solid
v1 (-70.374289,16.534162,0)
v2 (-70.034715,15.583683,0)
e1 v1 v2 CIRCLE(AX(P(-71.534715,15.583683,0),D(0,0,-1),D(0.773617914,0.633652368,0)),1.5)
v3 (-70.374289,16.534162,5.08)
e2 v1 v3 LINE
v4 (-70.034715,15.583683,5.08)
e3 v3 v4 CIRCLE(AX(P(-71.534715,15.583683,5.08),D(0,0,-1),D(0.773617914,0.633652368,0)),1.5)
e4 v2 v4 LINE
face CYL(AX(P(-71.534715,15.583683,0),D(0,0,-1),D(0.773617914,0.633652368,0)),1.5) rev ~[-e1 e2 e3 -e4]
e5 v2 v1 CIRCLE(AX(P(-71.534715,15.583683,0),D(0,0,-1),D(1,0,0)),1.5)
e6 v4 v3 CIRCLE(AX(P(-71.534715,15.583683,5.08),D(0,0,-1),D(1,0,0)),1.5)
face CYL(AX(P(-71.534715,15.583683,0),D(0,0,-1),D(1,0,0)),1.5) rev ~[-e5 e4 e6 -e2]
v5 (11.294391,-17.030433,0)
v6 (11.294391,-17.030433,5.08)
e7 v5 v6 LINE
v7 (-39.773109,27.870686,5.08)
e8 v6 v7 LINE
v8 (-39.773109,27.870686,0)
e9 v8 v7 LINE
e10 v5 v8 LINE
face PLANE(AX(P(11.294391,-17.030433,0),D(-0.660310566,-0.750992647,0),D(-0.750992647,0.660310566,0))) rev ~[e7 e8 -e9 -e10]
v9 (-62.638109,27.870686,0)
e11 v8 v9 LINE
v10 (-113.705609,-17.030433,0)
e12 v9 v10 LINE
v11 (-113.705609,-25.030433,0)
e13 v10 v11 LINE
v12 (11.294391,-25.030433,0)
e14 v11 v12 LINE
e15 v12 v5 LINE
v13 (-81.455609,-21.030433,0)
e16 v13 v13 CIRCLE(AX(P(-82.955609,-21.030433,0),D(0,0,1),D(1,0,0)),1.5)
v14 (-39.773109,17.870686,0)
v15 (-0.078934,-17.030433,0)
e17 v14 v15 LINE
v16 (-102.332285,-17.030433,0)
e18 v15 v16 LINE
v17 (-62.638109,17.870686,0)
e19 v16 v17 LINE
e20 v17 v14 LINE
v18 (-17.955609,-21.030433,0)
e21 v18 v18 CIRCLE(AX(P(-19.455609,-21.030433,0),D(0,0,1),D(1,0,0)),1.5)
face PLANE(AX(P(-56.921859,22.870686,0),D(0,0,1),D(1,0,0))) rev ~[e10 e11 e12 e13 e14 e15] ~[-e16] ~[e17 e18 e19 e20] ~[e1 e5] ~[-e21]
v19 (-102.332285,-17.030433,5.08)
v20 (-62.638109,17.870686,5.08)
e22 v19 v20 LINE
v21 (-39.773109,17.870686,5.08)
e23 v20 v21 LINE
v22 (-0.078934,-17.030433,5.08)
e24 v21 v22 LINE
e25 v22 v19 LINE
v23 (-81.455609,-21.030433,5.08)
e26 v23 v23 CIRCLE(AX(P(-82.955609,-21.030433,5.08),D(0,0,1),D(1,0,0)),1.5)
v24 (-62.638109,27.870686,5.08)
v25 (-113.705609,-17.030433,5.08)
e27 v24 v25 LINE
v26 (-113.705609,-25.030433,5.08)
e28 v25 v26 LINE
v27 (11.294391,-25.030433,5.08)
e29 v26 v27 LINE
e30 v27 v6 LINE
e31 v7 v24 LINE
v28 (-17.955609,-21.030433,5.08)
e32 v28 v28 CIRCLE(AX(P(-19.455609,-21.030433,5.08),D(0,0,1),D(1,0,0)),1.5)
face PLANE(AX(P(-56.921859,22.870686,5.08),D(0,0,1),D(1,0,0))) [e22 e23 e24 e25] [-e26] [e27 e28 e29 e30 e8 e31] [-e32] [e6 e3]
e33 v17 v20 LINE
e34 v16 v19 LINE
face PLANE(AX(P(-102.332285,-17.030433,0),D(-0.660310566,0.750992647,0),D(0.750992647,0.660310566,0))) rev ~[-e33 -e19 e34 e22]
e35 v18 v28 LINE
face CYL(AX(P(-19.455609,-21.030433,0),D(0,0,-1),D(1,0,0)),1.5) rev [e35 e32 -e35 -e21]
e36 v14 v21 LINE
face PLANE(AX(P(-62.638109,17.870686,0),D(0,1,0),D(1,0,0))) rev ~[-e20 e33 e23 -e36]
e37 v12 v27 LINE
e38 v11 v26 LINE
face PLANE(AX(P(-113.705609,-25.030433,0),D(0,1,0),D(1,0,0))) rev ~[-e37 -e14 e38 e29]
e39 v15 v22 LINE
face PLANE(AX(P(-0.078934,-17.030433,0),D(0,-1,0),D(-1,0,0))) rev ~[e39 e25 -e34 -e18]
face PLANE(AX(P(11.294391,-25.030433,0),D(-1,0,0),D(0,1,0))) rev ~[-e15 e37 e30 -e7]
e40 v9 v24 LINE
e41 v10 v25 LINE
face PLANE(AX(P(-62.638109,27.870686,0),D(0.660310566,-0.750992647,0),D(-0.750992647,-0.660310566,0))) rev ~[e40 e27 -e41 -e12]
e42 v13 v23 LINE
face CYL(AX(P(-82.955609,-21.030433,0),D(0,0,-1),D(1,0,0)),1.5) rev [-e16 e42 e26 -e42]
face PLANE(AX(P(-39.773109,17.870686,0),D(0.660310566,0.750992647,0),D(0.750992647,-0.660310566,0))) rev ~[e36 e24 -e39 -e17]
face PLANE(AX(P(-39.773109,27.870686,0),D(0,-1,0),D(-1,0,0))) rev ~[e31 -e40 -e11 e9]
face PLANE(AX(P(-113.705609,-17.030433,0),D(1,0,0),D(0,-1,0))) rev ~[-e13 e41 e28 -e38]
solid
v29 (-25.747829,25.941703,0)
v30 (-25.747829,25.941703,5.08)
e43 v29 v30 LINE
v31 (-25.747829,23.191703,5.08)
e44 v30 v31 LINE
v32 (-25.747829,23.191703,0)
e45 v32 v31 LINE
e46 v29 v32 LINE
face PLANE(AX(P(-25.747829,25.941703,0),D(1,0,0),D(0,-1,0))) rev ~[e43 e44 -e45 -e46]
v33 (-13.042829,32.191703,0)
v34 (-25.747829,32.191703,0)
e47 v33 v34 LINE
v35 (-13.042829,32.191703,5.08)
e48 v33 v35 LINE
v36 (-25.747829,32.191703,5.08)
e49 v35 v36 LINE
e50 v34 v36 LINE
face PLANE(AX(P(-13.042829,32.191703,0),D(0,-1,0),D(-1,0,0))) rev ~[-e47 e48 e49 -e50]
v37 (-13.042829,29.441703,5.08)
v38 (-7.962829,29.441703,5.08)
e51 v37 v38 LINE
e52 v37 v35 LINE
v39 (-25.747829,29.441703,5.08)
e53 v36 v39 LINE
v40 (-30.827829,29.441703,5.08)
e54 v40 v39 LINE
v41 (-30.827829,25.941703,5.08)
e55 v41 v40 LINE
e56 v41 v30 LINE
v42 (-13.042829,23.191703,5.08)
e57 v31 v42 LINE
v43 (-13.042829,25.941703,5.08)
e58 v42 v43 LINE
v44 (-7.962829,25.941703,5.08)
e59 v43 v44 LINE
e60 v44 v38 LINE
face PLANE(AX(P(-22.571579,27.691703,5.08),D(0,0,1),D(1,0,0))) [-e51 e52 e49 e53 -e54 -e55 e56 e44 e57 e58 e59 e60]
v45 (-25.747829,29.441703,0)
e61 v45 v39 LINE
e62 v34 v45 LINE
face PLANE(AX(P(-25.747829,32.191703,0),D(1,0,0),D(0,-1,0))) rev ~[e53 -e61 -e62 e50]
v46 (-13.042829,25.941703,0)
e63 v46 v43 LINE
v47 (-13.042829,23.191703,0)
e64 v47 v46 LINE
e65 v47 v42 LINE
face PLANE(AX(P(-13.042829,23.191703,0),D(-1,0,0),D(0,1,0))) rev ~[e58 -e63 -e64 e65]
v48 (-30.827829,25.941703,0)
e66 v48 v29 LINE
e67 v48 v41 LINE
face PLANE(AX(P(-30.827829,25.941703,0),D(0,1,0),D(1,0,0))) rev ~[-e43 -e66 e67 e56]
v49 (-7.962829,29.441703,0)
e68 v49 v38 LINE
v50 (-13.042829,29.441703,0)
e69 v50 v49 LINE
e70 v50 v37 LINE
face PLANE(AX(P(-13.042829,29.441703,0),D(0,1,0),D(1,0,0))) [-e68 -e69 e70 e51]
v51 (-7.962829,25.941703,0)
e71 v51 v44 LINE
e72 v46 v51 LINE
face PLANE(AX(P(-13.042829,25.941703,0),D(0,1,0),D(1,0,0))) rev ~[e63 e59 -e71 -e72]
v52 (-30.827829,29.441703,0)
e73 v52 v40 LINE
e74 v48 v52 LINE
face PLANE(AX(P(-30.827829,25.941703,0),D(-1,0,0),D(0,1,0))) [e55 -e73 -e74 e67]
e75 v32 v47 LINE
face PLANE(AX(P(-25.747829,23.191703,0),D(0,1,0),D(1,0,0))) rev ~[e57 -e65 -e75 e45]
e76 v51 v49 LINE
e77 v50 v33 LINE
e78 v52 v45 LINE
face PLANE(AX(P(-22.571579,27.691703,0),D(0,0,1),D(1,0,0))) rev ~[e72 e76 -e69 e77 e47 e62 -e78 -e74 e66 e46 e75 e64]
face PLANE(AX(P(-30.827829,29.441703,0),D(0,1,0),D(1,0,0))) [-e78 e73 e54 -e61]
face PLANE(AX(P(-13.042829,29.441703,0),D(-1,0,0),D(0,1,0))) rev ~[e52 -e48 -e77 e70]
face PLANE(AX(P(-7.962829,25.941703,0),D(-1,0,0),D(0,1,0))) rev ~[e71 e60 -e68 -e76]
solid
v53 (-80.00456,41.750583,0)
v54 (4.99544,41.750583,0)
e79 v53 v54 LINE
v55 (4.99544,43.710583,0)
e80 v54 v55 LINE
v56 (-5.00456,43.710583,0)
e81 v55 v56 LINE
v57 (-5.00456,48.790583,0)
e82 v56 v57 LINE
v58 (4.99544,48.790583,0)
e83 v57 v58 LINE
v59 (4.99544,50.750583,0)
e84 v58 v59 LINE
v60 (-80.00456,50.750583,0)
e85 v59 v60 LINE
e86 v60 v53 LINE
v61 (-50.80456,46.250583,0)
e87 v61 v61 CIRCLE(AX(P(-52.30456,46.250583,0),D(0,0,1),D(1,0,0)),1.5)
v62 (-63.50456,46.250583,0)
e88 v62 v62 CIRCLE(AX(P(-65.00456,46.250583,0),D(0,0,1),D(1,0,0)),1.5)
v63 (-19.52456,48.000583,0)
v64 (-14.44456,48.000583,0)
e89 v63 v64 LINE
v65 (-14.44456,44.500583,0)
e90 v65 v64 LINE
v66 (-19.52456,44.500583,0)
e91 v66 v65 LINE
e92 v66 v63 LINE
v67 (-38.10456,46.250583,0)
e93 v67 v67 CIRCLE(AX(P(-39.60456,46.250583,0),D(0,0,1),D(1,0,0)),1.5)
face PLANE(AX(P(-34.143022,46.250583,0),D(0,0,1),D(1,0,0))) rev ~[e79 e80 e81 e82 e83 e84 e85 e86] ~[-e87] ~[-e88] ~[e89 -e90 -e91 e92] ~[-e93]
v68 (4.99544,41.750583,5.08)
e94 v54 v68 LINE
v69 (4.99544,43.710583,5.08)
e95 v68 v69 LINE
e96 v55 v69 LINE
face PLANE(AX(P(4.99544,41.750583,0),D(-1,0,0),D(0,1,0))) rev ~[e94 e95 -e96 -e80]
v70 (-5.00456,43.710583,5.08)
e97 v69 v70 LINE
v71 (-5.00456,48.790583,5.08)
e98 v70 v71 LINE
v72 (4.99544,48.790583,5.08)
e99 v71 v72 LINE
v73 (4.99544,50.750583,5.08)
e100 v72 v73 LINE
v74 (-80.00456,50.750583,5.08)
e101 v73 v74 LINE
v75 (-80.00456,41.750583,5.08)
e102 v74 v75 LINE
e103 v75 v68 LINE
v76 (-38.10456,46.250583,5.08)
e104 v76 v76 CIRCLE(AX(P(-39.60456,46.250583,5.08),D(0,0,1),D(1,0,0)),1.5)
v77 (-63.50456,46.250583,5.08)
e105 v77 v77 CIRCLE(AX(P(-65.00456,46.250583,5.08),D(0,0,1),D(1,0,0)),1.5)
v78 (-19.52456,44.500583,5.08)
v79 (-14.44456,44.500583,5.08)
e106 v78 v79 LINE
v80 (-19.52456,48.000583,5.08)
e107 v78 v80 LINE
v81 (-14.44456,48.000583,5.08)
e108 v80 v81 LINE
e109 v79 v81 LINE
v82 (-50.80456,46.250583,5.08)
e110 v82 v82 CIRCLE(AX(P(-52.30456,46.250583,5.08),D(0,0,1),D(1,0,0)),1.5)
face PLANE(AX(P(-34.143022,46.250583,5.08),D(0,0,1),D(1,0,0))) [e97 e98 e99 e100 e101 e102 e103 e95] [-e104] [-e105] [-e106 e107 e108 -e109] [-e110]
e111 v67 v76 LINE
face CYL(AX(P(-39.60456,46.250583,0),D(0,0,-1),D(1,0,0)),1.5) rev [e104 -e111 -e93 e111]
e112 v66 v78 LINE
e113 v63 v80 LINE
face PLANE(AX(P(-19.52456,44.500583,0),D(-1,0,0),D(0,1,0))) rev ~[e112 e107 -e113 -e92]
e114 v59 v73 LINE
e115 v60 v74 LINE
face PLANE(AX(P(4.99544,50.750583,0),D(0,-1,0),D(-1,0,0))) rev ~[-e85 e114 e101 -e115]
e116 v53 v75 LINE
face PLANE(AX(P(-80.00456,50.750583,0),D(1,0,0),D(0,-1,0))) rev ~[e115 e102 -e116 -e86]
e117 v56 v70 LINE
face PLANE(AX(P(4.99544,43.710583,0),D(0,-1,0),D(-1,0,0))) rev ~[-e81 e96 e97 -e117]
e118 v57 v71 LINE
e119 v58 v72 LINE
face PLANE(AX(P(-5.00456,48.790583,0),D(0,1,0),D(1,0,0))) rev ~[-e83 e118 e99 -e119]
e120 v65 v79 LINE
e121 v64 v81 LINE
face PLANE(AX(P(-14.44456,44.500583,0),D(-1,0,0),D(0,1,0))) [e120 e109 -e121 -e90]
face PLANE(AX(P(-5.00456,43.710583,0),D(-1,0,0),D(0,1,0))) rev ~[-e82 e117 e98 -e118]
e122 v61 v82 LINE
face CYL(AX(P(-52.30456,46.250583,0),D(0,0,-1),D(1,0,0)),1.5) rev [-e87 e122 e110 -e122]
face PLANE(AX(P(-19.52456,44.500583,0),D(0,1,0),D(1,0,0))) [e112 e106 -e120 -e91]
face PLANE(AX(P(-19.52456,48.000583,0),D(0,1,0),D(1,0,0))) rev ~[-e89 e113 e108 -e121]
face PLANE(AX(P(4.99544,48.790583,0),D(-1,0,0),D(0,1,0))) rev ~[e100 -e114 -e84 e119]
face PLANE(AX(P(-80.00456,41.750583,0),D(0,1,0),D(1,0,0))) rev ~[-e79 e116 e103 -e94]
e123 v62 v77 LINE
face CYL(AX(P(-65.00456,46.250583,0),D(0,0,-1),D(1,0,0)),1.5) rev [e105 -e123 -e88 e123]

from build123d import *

# Parameters (mm, degrees)
F0_R     = 1.5
F0_W     = 5.08
F0_H     = 3.5
F1_DEPTH = 5.08
F0_W_2   = 11.4325
F0_H_2   = 10


# Not quite as in the source:
# - a feature names something its author has since deleted; it is built from what else it names


with BuildPart() as f1:
    # F0 (on Top) → F1 (new body)
    with BuildSketch(Plane.XY):
        Polygon((4.9954398084, 48.7905830651), (4.9954398084, 50.7505830651), (-80.0045601916, 50.7505830651), (-80.0045601916, 41.7505830651), (4.9954398084, 41.7505830651), (4.9954398084, 43.7105830651), (-5.0045601916, 43.7105830651), (-5.0045601916, 48.7905830651), align=None)
        with Locations((-65.0045601916, 46.2505830651)):
            Circle(F0_R, mode=Mode.SUBTRACT)
        with Locations((-52.3045601916, 46.2505830651)):
            Circle(F0_R, mode=Mode.SUBTRACT)
        with Locations((-39.6045601916, 46.2505830651)):
            Circle(F0_R, mode=Mode.SUBTRACT)
        with Locations((-16.9845601916, 46.2505830651)):
            Rectangle(F0_W, F0_H, mode=Mode.SUBTRACT)
    extrude(amount=F1_DEPTH)


with BuildPart() as f1b:
    # F0 (on Top) → F1, piece 2 (new body)
    with BuildSketch(Plane.XY):
        Polygon((-19.3953289995, 32.1917034835), (-25.7478289995, 32.1917034835), (-25.7478289995, 29.4417034835), (-25.7478289995, 25.9417034835), (-25.7478289995, 23.1917034835), (-19.3953289995, 23.1917034835), align=None)
        with Locations((-28.2878289995, 27.6917034835)):
            Rectangle(F0_W, F0_H)
        Polygon((-13.0428289995, 32.1917034835), (-19.3953289995, 32.1917034835), (-19.3953289995, 23.1917034835), (-13.0428289995, 23.1917034835), (-13.0428289995, 25.9417034835), (-13.0428289995, 29.4417034835), align=None)
        with Locations((-10.5028289995, 27.6917034835)):
            Rectangle(F0_W, F0_H)
    extrude(amount=F1_DEPTH)


with BuildPart() as f1c:
    # F0 (on Top) → F1, piece 3 (new body)
    with BuildSketch(Plane.XY):
        Polygon((-51.2056094673, 27.870685693), (-62.6381094673, 27.870685693), (-62.6381094673, 22.870685693), (-62.6381094673, 17.870685693), (-51.2056094673, 17.870685693), align=None)
        with Locations((-45.4893594673, 22.870685693)):
            Rectangle(F0_W_2, F0_H_2)
        Polygon((-62.6381094673, 22.870685693), (-62.6381094673, 27.870685693), (-113.7056094673, -17.0304328203), (-102.3322847728, -17.0304328203), (-62.6381094673, 17.870685693), align=None)
        with BuildLine():
            ThreePointArc((-70.0347154799, 15.5836834659), (-72.9472734976, 15.0790253177), (-70.3742886087, 16.5341620173))
            ThreePointArc((-70.3742886087, 16.5341620173), (-70.1221574622, 16.0883416142), (-70.0347154799, 15.5836834659))
        make_face(mode=Mode.SUBTRACT)
        Polygon((11.2943905327, -17.0304328203), (-39.7731094673, 27.870685693), (-39.7731094673, 17.870685693), (-0.0789341619, -17.0304328203), align=None)
        Polygon((-102.3322847728, -17.0304328203), (-113.7056094673, -17.0304328203), (-113.7056094673, -25.0304328203), (-51.2056094673, -25.0304328203), (-51.2056094673, -17.0304328203), align=None)
        with Locations((-82.9556094673, -21.0304328203)):
            Circle(F0_R, mode=Mode.SUBTRACT)
        Polygon((11.2943905327, -25.0304328203), (11.2943905327, -17.0304328203), (-0.0789341619, -17.0304328203), (-51.2056094673, -17.0304328203), (-51.2056094673, -25.0304328203), align=None)
        with Locations((-19.4556094673, -21.0304328203)):
            Circle(F0_R, mode=Mode.SUBTRACT)
    extrude(amount=F1_DEPTH)


solid = Compound([f1.part, f1b.part, f1c.part])
